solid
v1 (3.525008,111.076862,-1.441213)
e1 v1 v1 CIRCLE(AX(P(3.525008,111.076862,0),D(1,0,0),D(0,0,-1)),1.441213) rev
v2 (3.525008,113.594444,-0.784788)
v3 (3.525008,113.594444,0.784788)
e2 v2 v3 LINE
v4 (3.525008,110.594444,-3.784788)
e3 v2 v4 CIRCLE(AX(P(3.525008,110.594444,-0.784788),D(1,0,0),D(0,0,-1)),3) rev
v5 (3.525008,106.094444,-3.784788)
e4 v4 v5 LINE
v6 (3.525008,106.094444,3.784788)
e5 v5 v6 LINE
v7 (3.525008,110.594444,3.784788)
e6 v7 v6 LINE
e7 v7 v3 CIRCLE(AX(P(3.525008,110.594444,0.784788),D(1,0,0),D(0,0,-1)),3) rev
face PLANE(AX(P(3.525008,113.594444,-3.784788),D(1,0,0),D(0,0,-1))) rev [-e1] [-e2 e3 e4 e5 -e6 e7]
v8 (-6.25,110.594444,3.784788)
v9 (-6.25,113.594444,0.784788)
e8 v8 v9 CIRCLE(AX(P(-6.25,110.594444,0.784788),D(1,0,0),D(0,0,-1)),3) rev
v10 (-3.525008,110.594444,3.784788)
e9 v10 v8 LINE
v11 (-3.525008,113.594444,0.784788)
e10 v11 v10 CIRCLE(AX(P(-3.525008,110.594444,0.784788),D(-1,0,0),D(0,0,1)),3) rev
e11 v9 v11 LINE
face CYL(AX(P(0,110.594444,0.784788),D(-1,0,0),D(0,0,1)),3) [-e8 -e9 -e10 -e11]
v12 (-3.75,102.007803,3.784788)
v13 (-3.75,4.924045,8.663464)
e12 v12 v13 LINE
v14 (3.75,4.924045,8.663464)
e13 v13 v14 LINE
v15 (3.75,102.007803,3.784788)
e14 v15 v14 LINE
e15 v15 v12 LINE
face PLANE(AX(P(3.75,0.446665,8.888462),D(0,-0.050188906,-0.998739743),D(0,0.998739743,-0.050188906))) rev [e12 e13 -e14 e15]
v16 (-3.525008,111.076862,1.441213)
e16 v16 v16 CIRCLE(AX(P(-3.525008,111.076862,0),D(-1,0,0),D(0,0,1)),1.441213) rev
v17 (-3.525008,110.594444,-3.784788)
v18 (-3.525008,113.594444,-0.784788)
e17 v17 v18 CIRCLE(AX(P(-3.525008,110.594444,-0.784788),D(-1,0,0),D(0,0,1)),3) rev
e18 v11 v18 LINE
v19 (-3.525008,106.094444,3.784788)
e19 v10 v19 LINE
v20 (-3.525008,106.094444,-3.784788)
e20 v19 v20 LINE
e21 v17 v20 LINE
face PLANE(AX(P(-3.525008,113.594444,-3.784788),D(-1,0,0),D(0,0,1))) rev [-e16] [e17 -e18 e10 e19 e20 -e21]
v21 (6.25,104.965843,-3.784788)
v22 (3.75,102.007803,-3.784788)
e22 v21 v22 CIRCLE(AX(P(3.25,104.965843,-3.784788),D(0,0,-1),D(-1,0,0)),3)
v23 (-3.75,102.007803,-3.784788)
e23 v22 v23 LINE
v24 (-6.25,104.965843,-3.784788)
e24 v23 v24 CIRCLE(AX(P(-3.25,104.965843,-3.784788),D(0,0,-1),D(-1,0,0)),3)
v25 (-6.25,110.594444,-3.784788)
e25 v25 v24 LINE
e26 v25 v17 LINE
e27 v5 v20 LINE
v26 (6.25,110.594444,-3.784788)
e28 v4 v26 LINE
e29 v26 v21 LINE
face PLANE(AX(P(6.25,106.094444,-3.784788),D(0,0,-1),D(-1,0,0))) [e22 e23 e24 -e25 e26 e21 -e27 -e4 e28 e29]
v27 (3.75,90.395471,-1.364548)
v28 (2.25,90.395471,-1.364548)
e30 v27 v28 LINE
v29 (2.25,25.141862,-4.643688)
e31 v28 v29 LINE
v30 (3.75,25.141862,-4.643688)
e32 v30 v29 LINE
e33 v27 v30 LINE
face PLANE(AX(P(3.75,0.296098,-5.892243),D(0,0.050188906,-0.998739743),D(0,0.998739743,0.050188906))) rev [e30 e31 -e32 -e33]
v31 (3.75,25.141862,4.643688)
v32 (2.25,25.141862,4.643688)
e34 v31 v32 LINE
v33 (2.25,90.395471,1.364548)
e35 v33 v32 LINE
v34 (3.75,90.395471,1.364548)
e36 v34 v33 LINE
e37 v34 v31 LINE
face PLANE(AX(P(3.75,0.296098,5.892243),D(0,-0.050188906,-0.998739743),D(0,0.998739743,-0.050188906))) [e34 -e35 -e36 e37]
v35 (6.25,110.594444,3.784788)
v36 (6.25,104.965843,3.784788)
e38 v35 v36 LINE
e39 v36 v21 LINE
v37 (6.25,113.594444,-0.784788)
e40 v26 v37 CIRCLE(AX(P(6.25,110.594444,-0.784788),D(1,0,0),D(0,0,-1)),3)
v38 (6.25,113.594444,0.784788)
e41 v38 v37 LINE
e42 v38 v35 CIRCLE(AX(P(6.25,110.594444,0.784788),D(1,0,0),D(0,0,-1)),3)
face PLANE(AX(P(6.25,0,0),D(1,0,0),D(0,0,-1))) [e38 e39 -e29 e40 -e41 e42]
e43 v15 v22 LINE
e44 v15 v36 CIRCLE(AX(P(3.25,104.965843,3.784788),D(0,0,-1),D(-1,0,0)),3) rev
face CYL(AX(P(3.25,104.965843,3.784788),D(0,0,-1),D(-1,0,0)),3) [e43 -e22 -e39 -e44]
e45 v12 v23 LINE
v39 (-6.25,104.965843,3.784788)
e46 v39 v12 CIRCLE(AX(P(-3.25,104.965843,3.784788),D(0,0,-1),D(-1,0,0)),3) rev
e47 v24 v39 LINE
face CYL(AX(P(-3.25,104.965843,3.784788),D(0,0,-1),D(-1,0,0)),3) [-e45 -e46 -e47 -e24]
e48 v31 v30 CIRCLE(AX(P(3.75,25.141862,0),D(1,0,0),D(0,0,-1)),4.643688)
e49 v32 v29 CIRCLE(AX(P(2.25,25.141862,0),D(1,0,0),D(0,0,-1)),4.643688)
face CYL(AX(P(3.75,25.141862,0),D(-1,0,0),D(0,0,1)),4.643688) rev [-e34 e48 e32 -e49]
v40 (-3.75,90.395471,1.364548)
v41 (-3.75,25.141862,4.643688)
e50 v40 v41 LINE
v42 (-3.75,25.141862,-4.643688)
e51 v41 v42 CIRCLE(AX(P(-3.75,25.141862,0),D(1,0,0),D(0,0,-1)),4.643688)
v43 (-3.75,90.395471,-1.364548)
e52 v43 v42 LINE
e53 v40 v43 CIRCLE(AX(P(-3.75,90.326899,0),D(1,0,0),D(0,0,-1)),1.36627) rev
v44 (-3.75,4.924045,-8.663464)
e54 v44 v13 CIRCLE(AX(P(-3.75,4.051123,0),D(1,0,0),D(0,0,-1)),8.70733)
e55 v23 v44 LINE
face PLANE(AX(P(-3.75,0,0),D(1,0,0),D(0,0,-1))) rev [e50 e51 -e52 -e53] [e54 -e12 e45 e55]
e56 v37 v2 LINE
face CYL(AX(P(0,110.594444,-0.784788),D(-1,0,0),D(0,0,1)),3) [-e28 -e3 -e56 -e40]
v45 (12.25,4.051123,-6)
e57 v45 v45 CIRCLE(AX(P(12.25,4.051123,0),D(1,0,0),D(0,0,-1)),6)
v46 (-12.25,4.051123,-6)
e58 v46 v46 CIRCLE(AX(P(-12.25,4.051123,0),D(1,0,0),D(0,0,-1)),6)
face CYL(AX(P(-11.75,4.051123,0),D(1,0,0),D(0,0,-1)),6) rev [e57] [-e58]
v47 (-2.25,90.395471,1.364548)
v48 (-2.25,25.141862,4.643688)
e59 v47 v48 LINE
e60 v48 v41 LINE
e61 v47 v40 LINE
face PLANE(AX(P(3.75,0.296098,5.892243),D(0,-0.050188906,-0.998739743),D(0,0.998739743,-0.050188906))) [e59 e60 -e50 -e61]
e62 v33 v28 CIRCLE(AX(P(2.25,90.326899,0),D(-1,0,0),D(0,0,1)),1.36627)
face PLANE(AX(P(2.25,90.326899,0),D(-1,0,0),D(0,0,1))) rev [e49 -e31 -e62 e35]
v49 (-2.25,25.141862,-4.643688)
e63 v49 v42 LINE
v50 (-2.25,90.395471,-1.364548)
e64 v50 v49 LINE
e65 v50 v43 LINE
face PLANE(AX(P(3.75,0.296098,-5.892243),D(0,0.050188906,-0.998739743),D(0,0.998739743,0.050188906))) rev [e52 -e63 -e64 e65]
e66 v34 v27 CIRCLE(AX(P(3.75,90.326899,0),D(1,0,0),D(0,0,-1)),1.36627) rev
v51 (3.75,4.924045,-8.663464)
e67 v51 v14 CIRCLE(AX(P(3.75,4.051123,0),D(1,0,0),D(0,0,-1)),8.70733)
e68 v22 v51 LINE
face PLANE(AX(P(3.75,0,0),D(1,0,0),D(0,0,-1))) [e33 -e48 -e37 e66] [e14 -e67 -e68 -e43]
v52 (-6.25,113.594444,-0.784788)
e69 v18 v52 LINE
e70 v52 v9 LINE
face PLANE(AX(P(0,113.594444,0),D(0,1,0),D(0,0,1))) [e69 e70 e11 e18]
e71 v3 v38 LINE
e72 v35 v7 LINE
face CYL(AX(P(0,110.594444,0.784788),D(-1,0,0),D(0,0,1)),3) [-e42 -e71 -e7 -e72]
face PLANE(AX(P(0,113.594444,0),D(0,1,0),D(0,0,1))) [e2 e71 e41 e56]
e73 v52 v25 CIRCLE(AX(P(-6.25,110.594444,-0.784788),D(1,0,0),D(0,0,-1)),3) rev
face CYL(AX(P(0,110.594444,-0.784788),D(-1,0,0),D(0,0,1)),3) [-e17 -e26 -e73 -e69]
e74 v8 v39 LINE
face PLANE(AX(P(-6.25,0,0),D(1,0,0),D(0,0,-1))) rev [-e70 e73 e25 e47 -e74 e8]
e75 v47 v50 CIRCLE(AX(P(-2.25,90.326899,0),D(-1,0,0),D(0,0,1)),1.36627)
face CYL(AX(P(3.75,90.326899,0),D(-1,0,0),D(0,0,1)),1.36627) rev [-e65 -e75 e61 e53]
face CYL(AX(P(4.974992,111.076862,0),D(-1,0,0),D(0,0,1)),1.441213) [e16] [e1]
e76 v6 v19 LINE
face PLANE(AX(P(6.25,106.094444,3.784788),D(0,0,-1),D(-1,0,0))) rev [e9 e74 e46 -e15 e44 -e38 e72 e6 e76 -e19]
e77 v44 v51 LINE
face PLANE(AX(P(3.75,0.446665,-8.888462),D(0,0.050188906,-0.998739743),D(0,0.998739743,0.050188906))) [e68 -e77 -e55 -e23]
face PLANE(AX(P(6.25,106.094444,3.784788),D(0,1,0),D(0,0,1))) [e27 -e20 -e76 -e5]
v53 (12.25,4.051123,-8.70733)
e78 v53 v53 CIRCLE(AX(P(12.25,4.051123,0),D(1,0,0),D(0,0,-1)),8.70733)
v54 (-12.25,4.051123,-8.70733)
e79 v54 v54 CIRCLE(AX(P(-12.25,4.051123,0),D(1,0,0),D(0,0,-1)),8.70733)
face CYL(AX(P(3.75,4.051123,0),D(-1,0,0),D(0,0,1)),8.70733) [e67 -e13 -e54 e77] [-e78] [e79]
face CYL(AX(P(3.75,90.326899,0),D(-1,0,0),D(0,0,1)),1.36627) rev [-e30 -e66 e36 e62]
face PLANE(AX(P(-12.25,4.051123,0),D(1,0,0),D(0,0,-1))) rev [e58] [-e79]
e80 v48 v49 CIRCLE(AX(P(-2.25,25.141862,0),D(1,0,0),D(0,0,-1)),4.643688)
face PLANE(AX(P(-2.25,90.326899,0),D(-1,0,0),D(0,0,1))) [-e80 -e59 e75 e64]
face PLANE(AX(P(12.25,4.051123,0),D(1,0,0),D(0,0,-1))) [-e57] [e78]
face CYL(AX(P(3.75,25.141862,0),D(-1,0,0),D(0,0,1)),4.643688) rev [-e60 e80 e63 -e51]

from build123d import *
from build123d.topology import SkipClean

# Parameters (mm, degrees)
Y_KSEKLIK_EKSTR_ZYON2_DEPTH      = 3.75
Y_KSEKLIK_EKSTR_ZYON3_DEPTH      = 2.25
IZIM4_R                          = 6
KES_EKSTR_ZYON1_DEPTH            = 15.5
Y_KSEKLIK_EKSTR_ZYON5_DEPTH      = 8.5
Y_KSEKLIK_EKSTR_ZYON5_DEPTH_BACK = 16
IZIM5_R                          = 8.707330246
IZIM5_R_2                        = 6
IZIM1_6_W                        = 7.569576012
IZIM1_6_H                        = 4.08664072
Y_KSEKLIK_EKSTR_ZYON6_DEPTH      = 6.25
IZIM6_W                          = 2.724991533
IZIM6_H                          = 7.569576012
Y_KSEKLIK_EKSTR_ZYON7_DEPTH      = 7.5
IZIM7_R                          = 1.441213073
Y_KSEKLIK_EKSTR_ZYON8_DEPTH      = 8.5
RADYUS1_R                        = 3


with BuildPart() as part:
    # Çizim1 → Yükseklik-Ekstrüzyon2 (new, symmetric)
    with BuildSketch(Plane(origin=(0, 0, 0), x_dir=(0, 0, -1), z_dir=(1, 0, 0))):
        with BuildLine():
            Line((3.784788006, 102.00780299), (-3.784788006, 102.00780299))
            Line((-3.784788006, 102.00780299), (-8.707330246, 4.05112335))
            ThreePointArc((-8.707330246, 4.05112335), (0, -4.656206896), (8.707330246, 4.05112335))
            Line((8.707330246, 4.05112335), (3.784788006, 102.00780299))
        make_face()
        with BuildLine():
            Line((-4.643687916, 25.141862002), (-1.364548141, 90.395470555))
            ThreePointArc((-1.364548141, 90.395470555), (0, 91.693168951), (1.364548141, 90.395470555))
            Line((1.364548141, 90.395470555), (4.643687916, 25.141862002))
            ThreePointArc((4.643687916, 25.141862002), (0, 20.498174086), (-4.643687916, 25.141862002))
        make_face(mode=Mode.SUBTRACT)
    extrude(amount=Y_KSEKLIK_EKSTR_ZYON2_DEPTH, both=True)

    # Çizim1<5> → Yükseklik-Ekstrüzyon3 (add, symmetric)
    with BuildSketch(Plane(origin=(0, 0, 0), x_dir=(0, 0, -1), z_dir=(1, 0, 0))):
        with BuildLine():
            Line((-1.364548141, 90.395470555), (-4.643687916, 25.141862002))
            ThreePointArc((-4.643687916, 25.141862002), (0, 20.498174086), (4.643687916, 25.141862002))
            Line((4.643687916, 25.141862002), (1.364548141, 90.395470555))
            ThreePointArc((1.364548141, 90.395470555), (0, 91.693168951), (-1.364548141, 90.395470555))
        make_face()
    extrude(amount=Y_KSEKLIK_EKSTR_ZYON3_DEPTH, both=True)

    # Çizim4 → Kes-Ekstrüzyon1 (cut)
    with BuildSketch(Plane(origin=(3.75, 0, 0), x_dir=(0, 0, -1), z_dir=(1, 0, 0))):
        with Locations((0, 4.05112335)):
            Circle(IZIM4_R)
    extrude(amount=-KES_EKSTR_ZYON1_DEPTH, mode=Mode.SUBTRACT)

    # Çizim5 → Yükseklik-Ekstrüzyon5 (add, two sides: drawn at the far end of the back side and taken through both)
    with SkipClean():  # the faces are left unmerged after this step: merging them gives an invalid solid
        with BuildSketch(Plane(origin=(3.75, 0, 0), x_dir=(0, 0, -1), z_dir=(1, 0, 0)).offset(-Y_KSEKLIK_EKSTR_ZYON5_DEPTH_BACK)):
            with Locations((0, 4.05112335)):
                Circle(IZIM5_R)
            with Locations((0, 4.05112335)):
                Circle(IZIM5_R_2, mode=Mode.SUBTRACT)
        extrude(amount=Y_KSEKLIK_EKSTR_ZYON5_DEPTH + Y_KSEKLIK_EKSTR_ZYON5_DEPTH_BACK)

    # Çizim1<6> → Yükseklik-Ekstrüzyon6 (add, symmetric)
    with BuildSketch(Plane(origin=(0, 0, 0), x_dir=(0, 0, -1), z_dir=(1, 0, 0))):
        with Locations((0, 104.05112335)):
            Rectangle(IZIM1_6_W, IZIM1_6_H)
    extrude(amount=Y_KSEKLIK_EKSTR_ZYON6_DEPTH, both=True)

    # Çizim6 → Yükseklik-Ekstrüzyon7 (add)
    with BuildSketch(Plane(origin=(0, 106.09444371, 0), x_dir=(1, 0, 0), z_dir=(0, 1, 0))):
        with Locations((-4.887504233, 0)):
            Rectangle(IZIM6_W, IZIM6_H)
        with Locations((4.887504233, 0)):
            Rectangle(IZIM6_W, IZIM6_H)
    extrude(amount=Y_KSEKLIK_EKSTR_ZYON7_DEPTH)

    # Çizim7 → Yükseklik-Ekstrüzyon8 (add)
    with BuildSketch(Plane(origin=(-3.525008467, 0, 0), x_dir=(0, 0, -1), z_dir=(1, 0, 0))):
        with Locations(Location((0, 111.076861872, 0), (0, 0, 180))):
            Circle(IZIM7_R)
    extrude(amount=Y_KSEKLIK_EKSTR_ZYON8_DEPTH)

    # Radyus1
    # the kernel refuses this fillet: 3 mm, written as the material it takes off along each edge
    with BuildSketch(Plane(origin=(6.25, 102.00780299, -11.179887735), x_dir=(0, 1, 0), z_dir=(0, 0, 1))) as radyus1_piece_1:
        with BuildLine():
            CenterArc((2.958039892, 3), RADYUS1_R, 189.594068227, 80.405931773)
            Line((0, 2.5), (-0.059160798, 2.49))
            ThreePointArc((-0.059160798, 2.49), (-0.06, 1.25), (-0.06, 0))
            Line((-0.06, 0), (0, -0.06))
            Line((0, -0.06), (2.958039892, -0.06))
            Line((2.958039892, -0.06), (2.958039892, 0))
        make_face()
    extrude(amount=22.359775471, mode=Mode.SUBTRACT)
    with BuildSketch(Plane(origin=(-6.25, 102.00780299, -11.179887735), x_dir=(1, 0, 0), z_dir=(0, 0, 1))) as radyus1_piece_2:
        with BuildLine():
            CenterArc((3, 2.958039892), RADYUS1_R, 180, 80.405931773)
            Line((0, 2.958039892), (-0.06, 2.958039892))
            Line((-0.06, 2.958039892), (-0.06, 0))
            Line((-0.06, 0), (0, -0.06))
            ThreePointArc((0, -0.06), (1.25, -0.06), (2.49, -0.059160798))
            Line((2.49, -0.059160798), (2.5, 0))
        make_face()
    extrude(amount=22.359775471, mode=Mode.SUBTRACT)
    with BuildSketch(Plane(origin=(13.75, 113.59444371, 3.784788006), x_dir=(0, -1, 0), z_dir=(-1, 0, 0)), Plane(origin=(-3.974991533, 113.59444371, -3.784788006), x_dir=(0, -1, 0), z_dir=(1, 0, 0)), Plane(origin=(-13.75, 113.59444371, -3.784788006), x_dir=(0, -1, 0), z_dir=(1, 0, 0)), Plane(origin=(3.974991533, 113.59444371, 3.784788006), x_dir=(0, -1, 0), z_dir=(-1, 0, 0))) as radyus1_piece_3:
        with BuildLine():
            CenterArc((RADYUS1_R, -RADYUS1_R), RADYUS1_R, 90, 90)
            Line((0, -RADYUS1_R), (-RADYUS1_R * 0.02, -RADYUS1_R))
            Line((-RADYUS1_R * 0.02, -RADYUS1_R), (-RADYUS1_R * 0.02, RADYUS1_R * 0.02))
            Line((-RADYUS1_R * 0.02, RADYUS1_R * 0.02), (RADYUS1_R, RADYUS1_R * 0.02))
            Line((RADYUS1_R, RADYUS1_R * 0.02), (RADYUS1_R, 0))
        make_face()
    extrude(amount=17.724991533, mode=Mode.SUBTRACT)


solid = part.part
